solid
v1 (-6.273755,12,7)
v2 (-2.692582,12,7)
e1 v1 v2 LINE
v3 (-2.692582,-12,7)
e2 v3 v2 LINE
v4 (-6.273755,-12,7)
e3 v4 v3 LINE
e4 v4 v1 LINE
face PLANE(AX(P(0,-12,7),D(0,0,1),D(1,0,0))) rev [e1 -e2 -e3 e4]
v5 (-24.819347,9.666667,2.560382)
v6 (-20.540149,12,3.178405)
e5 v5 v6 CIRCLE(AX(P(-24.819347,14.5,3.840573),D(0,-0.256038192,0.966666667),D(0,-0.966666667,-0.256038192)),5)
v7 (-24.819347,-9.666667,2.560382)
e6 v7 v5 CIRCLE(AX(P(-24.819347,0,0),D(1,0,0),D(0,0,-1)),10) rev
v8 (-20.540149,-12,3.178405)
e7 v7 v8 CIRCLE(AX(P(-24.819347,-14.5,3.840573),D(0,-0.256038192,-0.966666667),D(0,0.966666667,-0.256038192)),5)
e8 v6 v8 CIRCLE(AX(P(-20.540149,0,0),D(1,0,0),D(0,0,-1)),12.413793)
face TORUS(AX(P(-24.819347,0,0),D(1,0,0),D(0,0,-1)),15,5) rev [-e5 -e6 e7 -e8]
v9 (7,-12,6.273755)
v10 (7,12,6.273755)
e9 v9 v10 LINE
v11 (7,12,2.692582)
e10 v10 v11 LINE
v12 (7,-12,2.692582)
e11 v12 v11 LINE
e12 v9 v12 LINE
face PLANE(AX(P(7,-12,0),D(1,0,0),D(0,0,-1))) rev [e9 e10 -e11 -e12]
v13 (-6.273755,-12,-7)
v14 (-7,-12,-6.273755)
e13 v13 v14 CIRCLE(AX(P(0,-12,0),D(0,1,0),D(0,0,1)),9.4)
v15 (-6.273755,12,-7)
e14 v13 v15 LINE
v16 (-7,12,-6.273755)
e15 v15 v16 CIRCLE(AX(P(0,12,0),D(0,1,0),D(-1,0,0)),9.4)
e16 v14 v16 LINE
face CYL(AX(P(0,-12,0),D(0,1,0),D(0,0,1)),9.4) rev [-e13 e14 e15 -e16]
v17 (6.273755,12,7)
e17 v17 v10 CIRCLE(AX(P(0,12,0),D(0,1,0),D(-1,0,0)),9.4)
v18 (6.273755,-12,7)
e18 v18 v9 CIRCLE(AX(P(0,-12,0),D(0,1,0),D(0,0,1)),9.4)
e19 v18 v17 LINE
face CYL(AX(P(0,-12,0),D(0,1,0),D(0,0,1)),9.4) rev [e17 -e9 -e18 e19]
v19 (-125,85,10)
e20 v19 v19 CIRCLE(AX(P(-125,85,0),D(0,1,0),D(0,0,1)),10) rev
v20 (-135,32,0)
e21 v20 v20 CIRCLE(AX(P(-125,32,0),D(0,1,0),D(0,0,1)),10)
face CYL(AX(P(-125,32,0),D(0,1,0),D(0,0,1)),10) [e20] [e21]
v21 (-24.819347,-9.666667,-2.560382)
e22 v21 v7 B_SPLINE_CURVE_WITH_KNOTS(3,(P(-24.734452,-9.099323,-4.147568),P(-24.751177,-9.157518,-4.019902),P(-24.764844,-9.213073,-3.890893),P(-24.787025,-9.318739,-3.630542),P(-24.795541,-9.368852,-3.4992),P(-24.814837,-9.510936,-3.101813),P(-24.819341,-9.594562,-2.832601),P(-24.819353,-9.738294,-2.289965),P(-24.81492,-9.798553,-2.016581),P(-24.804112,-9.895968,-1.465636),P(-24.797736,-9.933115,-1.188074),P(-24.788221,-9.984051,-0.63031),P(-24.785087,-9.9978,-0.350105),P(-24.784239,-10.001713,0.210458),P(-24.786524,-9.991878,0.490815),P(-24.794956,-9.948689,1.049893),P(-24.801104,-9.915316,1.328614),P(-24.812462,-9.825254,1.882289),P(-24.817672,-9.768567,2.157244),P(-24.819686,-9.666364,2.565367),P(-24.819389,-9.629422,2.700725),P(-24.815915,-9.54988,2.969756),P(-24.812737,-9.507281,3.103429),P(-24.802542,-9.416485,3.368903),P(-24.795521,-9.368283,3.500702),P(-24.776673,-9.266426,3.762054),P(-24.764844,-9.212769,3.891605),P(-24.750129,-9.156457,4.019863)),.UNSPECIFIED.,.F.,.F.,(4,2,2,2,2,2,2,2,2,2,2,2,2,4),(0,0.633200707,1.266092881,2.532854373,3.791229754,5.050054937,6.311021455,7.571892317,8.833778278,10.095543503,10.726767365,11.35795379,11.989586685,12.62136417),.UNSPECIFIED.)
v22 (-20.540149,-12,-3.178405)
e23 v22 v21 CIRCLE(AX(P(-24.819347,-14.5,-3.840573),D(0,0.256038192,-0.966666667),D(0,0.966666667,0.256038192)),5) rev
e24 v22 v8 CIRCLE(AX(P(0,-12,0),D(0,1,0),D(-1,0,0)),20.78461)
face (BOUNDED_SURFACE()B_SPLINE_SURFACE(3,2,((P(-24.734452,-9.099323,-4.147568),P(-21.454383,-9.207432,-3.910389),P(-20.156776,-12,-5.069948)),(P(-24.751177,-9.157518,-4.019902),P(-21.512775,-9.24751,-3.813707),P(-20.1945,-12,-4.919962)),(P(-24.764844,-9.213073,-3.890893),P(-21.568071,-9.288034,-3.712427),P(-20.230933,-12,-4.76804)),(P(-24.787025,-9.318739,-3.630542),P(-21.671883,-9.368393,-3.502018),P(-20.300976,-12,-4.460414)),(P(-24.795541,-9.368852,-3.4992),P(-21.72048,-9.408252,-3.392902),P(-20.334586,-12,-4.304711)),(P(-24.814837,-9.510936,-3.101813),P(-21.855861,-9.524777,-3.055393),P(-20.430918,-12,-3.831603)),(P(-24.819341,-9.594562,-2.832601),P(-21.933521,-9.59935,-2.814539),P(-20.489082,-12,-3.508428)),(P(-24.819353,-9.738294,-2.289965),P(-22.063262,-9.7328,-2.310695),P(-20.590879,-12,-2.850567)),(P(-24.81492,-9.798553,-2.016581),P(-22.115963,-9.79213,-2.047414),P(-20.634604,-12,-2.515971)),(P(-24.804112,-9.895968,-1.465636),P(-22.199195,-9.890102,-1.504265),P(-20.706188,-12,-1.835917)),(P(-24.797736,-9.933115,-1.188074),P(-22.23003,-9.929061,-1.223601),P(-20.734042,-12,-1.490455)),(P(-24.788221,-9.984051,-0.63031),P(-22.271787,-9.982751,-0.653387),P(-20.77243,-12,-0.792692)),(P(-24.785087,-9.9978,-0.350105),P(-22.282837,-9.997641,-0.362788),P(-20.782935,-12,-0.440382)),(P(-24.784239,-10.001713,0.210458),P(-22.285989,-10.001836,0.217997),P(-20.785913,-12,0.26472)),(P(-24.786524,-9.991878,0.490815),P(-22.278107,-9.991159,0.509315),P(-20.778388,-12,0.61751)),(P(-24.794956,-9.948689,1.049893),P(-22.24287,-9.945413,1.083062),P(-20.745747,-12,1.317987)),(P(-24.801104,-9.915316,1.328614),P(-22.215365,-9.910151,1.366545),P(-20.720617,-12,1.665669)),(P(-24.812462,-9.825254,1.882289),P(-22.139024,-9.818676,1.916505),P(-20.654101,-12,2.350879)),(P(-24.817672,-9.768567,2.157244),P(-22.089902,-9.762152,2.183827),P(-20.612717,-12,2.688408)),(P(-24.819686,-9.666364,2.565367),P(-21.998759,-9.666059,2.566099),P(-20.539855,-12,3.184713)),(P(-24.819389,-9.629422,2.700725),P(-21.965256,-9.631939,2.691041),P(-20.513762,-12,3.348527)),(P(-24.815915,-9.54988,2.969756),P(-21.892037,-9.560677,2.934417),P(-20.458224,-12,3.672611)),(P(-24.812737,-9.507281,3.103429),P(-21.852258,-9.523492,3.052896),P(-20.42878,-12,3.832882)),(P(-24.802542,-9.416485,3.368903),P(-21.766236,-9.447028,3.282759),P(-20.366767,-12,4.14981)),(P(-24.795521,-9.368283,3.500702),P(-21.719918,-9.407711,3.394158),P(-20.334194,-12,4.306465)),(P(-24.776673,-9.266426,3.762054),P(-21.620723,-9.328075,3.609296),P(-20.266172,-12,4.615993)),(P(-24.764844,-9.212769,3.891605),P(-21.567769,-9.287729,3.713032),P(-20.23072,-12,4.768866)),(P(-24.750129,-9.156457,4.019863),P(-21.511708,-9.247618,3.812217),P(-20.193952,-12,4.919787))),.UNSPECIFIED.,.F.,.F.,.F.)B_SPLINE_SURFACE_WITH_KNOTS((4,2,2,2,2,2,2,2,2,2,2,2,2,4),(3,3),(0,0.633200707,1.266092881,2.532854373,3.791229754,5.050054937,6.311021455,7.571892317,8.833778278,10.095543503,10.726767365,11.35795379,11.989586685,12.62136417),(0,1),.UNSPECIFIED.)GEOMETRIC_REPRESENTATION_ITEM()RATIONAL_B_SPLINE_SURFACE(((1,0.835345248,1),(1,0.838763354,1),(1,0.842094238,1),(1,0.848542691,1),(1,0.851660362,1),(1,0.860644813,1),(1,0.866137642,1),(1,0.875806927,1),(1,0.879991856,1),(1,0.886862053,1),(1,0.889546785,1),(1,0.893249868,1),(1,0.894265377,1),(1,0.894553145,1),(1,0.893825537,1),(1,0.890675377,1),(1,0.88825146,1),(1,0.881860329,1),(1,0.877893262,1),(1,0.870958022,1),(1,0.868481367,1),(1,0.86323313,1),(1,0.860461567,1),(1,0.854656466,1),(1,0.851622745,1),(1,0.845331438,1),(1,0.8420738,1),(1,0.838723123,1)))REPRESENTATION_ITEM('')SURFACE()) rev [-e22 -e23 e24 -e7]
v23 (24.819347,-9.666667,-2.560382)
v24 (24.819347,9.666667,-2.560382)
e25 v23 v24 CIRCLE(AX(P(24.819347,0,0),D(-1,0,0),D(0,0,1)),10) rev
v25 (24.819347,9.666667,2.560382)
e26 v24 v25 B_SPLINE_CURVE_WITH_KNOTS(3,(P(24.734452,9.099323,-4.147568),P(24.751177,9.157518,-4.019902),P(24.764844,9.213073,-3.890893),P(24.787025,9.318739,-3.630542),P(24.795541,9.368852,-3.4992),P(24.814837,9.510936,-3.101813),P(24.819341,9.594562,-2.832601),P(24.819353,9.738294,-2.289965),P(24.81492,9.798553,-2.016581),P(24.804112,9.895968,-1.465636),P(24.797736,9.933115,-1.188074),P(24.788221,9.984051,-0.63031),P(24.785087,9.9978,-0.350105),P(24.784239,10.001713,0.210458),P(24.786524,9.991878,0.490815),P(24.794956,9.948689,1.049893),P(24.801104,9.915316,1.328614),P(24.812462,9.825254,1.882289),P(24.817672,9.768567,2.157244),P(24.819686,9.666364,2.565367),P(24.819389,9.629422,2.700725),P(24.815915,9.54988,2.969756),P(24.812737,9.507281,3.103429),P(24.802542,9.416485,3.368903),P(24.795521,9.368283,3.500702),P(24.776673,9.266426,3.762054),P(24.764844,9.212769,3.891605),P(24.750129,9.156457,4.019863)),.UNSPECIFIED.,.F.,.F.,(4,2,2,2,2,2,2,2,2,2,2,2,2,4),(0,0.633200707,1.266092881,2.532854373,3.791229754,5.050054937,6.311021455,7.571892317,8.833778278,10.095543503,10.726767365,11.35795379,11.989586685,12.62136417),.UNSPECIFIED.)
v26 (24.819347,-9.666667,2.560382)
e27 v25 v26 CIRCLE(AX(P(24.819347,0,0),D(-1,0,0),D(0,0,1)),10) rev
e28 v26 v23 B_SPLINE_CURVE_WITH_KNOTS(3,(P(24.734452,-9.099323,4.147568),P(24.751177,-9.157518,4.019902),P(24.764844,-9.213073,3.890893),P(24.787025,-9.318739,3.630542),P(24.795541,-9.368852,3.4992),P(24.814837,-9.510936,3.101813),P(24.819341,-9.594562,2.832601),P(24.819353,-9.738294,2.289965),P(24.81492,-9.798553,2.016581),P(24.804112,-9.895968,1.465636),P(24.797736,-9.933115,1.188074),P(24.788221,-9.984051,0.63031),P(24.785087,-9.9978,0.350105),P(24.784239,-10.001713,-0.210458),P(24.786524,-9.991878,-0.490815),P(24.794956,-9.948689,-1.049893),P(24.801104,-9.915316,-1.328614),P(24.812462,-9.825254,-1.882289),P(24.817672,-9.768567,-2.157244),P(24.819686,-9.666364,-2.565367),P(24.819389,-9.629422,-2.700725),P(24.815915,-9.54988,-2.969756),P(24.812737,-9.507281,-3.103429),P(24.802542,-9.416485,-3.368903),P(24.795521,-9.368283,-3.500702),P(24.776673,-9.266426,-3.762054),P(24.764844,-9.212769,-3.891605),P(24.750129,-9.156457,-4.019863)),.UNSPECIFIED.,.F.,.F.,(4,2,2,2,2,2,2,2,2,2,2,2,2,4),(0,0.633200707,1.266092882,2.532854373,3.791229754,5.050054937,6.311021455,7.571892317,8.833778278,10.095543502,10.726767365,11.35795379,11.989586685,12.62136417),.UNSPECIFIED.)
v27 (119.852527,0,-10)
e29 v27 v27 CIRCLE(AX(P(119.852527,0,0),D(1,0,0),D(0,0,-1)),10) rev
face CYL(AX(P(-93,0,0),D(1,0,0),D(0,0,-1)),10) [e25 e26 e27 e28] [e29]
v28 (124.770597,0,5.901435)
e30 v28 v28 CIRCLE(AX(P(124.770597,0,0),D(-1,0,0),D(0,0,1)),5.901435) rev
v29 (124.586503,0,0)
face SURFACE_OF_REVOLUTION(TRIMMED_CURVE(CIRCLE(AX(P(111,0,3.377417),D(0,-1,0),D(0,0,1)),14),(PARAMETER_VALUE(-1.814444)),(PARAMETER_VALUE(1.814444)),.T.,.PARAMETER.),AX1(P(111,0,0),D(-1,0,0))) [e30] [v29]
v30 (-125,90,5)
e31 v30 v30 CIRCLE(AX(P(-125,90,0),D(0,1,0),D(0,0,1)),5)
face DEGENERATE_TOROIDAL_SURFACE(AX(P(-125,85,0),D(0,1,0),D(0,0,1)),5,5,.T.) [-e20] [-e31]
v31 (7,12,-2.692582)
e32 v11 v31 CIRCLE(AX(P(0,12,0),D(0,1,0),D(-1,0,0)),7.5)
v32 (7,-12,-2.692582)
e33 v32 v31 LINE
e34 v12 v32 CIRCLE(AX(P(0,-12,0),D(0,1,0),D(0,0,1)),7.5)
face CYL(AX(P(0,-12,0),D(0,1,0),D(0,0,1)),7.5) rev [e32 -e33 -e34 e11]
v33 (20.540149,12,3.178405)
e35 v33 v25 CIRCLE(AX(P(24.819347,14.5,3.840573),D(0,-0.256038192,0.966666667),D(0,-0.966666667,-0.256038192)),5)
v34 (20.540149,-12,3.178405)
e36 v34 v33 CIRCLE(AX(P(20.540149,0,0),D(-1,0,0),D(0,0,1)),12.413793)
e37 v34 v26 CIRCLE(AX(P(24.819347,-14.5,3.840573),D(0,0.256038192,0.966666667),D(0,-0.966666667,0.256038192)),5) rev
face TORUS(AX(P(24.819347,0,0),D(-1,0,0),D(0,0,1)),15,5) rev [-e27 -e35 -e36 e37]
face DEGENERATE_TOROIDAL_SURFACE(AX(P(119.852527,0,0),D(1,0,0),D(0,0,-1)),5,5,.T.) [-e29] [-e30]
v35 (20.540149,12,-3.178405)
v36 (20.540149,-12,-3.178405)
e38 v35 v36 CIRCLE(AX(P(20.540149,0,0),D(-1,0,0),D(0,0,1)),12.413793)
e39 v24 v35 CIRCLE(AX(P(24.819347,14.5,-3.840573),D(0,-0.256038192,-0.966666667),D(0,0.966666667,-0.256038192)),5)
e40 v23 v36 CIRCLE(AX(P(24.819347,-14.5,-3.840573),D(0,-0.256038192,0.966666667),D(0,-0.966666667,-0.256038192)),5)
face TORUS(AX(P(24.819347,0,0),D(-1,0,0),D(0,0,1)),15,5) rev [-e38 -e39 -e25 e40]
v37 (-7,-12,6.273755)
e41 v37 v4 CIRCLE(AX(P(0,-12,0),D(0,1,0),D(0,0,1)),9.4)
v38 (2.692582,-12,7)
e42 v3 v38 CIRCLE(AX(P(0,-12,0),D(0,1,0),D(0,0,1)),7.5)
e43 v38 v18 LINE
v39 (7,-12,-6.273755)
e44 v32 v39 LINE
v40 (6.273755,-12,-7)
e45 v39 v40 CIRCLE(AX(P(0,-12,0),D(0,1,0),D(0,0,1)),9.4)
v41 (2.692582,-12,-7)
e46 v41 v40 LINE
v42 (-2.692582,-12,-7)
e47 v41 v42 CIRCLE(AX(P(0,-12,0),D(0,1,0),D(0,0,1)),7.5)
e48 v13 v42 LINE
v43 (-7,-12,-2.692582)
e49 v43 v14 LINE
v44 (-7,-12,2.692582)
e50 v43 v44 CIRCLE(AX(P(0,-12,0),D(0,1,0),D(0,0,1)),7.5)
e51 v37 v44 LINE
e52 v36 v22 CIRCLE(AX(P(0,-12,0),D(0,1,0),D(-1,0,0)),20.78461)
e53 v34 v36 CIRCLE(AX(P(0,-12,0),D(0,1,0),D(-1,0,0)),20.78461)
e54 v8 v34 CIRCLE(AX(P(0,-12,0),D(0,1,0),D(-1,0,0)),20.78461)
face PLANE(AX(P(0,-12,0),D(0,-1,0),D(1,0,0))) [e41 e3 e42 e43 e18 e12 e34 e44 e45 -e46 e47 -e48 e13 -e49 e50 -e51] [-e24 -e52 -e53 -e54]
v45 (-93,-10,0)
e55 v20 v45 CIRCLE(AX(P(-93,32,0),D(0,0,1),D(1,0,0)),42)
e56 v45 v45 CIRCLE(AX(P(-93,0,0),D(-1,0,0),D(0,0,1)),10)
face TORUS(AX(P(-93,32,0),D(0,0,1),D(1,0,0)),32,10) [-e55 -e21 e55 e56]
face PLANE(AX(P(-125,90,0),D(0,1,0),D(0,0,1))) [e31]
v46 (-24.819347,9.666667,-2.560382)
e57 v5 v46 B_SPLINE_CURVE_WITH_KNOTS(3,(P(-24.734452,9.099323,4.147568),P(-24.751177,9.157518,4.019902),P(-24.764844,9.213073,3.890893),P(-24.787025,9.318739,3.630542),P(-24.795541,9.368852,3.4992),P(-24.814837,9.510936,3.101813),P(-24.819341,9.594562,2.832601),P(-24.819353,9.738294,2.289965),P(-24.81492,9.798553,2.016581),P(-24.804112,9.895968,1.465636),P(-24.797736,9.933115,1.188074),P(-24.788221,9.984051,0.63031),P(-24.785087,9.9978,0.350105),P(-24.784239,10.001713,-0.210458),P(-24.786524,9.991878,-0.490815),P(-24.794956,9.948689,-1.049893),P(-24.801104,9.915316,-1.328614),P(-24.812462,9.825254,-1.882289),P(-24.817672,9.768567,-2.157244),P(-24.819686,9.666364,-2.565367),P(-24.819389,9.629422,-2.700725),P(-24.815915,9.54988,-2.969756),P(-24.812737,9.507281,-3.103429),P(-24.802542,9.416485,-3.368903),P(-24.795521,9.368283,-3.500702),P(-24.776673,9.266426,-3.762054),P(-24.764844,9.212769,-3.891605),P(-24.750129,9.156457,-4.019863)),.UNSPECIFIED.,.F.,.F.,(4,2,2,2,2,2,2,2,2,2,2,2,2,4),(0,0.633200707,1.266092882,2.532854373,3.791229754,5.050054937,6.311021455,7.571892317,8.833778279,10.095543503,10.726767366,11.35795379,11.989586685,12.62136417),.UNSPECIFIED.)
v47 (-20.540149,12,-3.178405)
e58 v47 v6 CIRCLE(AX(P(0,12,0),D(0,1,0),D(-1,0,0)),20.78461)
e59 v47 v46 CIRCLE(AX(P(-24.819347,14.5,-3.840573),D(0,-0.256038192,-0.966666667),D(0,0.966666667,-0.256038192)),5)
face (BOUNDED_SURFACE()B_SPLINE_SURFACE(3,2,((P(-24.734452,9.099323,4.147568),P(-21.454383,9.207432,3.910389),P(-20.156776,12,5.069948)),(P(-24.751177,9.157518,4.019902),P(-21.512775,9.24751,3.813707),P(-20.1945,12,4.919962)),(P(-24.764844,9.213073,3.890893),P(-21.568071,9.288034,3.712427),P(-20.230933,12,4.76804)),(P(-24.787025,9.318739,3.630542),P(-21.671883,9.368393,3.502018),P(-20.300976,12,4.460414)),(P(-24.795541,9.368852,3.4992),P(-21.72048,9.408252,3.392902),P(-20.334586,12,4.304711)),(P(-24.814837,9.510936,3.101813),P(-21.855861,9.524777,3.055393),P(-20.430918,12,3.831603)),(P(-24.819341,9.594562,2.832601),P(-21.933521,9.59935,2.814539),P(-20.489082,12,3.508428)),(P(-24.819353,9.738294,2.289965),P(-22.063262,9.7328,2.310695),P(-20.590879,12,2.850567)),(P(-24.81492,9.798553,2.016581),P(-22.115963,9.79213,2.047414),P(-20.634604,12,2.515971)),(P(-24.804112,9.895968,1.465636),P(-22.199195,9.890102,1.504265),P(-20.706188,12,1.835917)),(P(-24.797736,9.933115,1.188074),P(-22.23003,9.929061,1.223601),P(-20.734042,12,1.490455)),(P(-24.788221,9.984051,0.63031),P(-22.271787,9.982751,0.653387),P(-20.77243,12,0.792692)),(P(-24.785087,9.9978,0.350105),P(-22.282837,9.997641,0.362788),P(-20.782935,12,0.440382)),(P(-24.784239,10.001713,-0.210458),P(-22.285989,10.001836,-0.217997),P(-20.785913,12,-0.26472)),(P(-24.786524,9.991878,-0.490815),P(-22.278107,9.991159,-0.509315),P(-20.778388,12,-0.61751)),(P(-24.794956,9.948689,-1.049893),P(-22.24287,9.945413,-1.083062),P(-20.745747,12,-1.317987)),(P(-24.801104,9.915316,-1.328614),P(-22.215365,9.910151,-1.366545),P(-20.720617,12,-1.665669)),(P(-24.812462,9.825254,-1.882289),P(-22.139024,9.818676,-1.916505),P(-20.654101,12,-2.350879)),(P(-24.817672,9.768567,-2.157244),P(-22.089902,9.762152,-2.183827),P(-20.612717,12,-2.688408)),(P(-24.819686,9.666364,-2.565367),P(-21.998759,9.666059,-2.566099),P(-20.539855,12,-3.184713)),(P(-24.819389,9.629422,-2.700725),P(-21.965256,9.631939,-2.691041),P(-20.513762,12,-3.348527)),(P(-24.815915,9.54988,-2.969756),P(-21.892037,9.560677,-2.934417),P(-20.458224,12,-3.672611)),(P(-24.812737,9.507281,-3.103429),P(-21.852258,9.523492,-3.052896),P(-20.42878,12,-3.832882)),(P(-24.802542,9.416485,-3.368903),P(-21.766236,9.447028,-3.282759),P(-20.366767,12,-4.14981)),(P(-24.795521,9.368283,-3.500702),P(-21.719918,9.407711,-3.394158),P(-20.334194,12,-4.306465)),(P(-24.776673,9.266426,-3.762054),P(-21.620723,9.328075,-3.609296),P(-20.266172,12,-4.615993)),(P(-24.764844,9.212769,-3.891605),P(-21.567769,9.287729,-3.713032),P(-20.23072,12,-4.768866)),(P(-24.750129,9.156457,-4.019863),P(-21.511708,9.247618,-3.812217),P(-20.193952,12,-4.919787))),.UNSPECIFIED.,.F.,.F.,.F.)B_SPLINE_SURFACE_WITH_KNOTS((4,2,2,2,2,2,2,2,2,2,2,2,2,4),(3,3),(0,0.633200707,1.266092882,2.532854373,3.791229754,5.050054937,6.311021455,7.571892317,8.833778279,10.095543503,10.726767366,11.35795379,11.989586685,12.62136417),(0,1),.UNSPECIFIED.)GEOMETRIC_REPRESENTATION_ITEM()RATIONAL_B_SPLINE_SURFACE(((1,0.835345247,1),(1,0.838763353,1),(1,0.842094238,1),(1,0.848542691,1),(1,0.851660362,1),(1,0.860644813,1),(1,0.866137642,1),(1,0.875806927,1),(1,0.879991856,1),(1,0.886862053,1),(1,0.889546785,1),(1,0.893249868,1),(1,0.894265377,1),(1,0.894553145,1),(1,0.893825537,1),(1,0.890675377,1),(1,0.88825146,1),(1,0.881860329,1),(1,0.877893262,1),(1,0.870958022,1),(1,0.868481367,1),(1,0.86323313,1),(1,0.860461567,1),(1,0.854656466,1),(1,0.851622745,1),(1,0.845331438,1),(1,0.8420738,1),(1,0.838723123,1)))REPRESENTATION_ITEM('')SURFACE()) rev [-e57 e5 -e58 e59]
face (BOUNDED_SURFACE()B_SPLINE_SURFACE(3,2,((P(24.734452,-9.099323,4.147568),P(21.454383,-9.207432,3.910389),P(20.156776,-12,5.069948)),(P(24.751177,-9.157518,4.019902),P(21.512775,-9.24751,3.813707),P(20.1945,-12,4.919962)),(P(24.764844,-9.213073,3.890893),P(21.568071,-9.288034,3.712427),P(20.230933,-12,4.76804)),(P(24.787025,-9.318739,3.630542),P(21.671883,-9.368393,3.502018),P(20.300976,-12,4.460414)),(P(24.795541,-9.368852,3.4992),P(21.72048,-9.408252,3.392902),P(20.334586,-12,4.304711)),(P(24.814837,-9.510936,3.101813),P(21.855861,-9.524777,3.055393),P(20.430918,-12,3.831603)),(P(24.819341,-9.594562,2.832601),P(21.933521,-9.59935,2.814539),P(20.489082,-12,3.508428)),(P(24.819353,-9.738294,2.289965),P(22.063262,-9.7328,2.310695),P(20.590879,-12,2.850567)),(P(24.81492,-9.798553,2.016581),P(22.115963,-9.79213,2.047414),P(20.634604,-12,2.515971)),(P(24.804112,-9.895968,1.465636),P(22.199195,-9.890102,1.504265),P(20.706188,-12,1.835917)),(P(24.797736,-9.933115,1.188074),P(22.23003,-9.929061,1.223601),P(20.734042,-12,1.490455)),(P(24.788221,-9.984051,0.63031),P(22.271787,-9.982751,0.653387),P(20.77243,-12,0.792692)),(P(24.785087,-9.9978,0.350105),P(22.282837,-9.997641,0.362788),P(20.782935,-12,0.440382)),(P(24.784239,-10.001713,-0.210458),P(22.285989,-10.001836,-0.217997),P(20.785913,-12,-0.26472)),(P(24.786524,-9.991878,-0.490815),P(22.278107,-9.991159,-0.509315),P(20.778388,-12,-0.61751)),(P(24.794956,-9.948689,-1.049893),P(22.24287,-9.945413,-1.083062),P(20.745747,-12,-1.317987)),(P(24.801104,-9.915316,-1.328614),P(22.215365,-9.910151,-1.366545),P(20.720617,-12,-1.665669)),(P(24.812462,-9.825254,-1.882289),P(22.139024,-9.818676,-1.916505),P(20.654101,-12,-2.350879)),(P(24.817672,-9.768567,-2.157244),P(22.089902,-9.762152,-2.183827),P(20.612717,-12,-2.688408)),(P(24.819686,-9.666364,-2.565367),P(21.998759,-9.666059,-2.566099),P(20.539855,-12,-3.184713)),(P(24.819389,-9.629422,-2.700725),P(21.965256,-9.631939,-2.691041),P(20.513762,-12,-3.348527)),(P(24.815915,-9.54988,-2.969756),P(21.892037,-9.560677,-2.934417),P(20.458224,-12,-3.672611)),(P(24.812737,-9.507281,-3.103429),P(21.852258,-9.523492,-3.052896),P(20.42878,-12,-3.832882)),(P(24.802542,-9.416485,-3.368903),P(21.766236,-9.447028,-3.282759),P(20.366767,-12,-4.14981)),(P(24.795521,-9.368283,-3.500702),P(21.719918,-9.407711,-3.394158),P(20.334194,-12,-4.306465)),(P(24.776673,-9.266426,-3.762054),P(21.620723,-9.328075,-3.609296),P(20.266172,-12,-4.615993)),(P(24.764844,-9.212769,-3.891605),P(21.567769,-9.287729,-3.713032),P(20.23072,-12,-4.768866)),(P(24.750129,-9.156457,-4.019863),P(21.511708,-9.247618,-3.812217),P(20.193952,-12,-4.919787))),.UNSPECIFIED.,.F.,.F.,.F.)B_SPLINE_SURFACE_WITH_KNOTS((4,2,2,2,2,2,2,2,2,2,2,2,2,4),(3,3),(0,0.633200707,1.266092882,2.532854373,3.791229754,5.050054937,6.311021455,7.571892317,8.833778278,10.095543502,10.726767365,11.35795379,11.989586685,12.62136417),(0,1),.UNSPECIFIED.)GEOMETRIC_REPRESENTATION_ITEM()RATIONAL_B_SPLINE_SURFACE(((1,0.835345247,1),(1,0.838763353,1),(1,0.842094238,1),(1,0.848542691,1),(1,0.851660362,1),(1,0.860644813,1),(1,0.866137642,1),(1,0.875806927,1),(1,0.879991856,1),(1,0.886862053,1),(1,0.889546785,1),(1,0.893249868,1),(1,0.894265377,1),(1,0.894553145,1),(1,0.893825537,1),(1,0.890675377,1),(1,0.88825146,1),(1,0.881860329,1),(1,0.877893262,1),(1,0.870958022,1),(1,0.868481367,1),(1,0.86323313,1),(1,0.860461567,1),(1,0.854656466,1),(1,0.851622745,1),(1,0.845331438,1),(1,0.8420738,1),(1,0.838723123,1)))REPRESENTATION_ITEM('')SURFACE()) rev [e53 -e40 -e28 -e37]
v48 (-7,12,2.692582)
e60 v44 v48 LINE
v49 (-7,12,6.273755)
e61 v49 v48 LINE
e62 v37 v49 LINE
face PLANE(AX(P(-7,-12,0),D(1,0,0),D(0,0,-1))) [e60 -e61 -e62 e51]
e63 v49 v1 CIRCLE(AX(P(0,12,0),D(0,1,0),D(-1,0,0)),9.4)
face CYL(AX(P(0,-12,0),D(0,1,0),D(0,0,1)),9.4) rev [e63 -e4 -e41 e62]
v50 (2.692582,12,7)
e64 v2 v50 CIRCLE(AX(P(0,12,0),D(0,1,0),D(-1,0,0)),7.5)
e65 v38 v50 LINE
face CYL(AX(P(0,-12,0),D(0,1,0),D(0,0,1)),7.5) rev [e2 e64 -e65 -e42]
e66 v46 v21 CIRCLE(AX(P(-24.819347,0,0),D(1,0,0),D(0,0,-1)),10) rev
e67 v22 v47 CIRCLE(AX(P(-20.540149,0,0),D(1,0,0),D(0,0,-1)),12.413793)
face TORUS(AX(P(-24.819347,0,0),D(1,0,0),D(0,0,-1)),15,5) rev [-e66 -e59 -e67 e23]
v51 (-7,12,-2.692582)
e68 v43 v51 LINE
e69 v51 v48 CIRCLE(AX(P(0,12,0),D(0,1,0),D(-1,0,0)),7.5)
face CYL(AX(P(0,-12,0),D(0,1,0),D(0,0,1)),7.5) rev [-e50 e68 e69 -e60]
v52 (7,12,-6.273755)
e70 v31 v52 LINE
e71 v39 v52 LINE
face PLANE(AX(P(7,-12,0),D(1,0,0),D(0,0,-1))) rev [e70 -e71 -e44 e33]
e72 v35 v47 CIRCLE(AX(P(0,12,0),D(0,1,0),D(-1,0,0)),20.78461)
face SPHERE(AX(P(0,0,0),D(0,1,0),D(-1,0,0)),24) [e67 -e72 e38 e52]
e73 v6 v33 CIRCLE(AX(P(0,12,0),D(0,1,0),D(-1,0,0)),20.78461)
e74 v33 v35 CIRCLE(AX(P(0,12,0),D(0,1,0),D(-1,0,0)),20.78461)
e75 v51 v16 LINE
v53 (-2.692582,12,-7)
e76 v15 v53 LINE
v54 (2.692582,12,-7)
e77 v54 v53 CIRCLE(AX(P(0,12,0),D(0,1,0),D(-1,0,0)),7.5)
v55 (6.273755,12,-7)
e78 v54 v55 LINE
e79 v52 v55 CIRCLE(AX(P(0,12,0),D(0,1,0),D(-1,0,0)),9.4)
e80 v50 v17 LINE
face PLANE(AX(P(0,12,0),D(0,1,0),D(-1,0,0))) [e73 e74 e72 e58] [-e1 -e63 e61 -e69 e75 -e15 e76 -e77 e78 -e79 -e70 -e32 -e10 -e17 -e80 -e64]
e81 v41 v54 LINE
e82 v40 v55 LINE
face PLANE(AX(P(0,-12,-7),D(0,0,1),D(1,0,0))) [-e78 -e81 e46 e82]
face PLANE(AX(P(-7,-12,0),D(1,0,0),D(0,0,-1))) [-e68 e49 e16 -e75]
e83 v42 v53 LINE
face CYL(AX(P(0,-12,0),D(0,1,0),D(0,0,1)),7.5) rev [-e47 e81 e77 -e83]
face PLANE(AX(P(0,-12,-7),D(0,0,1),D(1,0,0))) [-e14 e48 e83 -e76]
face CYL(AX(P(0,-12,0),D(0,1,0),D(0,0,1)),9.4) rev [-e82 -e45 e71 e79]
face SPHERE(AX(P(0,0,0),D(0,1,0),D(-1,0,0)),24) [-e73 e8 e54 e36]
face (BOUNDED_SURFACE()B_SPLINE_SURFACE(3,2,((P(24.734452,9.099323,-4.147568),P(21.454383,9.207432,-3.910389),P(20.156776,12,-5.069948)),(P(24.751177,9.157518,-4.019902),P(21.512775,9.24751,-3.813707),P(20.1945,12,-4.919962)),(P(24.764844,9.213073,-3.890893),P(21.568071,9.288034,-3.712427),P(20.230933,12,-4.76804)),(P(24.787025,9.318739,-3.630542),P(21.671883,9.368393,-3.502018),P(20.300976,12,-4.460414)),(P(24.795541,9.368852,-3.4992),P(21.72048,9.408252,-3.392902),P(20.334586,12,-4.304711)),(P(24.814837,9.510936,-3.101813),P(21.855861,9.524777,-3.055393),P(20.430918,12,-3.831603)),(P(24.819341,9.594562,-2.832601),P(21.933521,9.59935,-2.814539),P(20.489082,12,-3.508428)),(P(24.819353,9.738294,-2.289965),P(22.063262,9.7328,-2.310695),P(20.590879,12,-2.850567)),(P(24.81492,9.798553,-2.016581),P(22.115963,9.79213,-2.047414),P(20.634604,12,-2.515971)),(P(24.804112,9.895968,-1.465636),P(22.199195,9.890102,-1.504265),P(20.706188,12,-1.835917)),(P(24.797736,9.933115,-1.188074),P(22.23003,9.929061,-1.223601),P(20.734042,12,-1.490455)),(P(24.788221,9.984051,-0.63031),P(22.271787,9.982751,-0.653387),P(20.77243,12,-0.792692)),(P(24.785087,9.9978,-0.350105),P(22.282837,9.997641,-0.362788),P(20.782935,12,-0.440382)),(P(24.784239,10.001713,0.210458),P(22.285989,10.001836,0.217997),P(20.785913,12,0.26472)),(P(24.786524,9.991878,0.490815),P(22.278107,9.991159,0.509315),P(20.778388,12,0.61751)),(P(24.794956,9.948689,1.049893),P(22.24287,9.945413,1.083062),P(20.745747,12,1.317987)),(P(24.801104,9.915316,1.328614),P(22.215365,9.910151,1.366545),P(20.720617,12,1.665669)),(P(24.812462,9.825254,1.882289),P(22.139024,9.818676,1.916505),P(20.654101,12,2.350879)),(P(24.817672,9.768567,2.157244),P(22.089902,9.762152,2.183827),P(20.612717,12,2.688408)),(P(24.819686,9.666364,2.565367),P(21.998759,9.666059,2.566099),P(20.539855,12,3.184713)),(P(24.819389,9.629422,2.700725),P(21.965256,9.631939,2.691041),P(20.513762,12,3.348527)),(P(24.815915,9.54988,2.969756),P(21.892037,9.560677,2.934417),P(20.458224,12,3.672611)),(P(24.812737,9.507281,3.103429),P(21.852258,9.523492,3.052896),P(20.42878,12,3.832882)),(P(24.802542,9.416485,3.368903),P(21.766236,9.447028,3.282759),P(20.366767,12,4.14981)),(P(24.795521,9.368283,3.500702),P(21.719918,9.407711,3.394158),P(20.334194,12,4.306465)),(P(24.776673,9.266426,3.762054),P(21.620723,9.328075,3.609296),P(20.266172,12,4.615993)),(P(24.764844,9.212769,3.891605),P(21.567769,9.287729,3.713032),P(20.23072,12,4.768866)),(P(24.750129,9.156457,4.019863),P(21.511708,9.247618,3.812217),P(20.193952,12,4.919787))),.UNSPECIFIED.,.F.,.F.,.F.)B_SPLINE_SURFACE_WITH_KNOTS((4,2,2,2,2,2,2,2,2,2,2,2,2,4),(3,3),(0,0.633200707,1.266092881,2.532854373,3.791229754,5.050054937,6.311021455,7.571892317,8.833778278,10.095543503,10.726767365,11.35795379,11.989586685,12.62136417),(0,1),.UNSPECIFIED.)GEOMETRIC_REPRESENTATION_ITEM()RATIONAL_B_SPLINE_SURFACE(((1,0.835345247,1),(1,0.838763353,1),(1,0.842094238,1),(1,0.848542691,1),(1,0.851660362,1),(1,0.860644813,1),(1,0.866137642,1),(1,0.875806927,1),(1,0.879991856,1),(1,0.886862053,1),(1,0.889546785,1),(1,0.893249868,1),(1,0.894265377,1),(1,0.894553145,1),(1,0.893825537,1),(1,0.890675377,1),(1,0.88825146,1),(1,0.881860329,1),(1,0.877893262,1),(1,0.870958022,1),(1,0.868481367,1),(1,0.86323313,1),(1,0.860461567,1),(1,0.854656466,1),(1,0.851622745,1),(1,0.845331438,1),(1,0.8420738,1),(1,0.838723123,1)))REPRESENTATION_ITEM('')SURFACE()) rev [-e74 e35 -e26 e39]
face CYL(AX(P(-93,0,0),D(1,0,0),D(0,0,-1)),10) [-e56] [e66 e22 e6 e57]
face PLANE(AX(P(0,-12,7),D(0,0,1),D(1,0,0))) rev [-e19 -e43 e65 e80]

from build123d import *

# Parameters (mm, degrees)
SKETCH_2_R               = 9.999999999999993
FILLET_1_R               = 5
CUT_EXTRUDE_1_DEPTH      = 165.01524327634917
CUT_EXTRUDE_1_DEPTH_BACK = 165.01524327634917


with BuildPart() as part:
    # По траектории1: sweep along a path in Эскиз1
    with BuildLine(Plane.XY) as sweep_1_path:
        Line((-125, 90), (-125, 31.999999999999993))
        ThreePointArc((-125, 31.999999999999993), (-115.62741699796952, 9.372583002030478), (-93, 0))
        Line((-93, 0), (124.99999999999999, 0))
    # Эскиз2 → По траектории1 (sweep)
    with BuildSketch(Plane(origin=(0, 90, 0), x_dir=(1, 0, 0), z_dir=(0, 1, 0))):
        with Locations((-125, 0)):
            Circle(SKETCH_2_R)
    sweep(path=sweep_1_path.line)

    # Эскиз3 → Повернуть1 (revolve)
    with BuildSketch(Plane.XY):
        with BuildLine():
            Line((4.49e-15, 12), (4.49e-15, -12))
            Line((4.49e-15, -12), (-20.784609690826528, -12))
            ThreePointArc((-20.784609690826528, -12), (-24, 2.94e-15), (-20.784609690826528, 12))
            Line((-20.784609690826528, 12), (4.49e-15, 12))
        make_face()
    revolve(axis=Axis((4.49e-15, 20.353481922740002, 0), (-1.1e-16, -1, 0)))

    # Эскиз6 → Вырез-Повернуть1 (revolve, cut)
    with BuildSketch(Plane.XY, mode=Mode.PRIVATE) as cut_revolve_1_sk:
        with BuildLine():
            Line((123.3345611656252, 10.000000000000009), (253.93494063523158, 10.000000000000009))
            Line((253.93494063523158, 10.000000000000009), (253.93494063523158, 0))
            Line((253.93494063523158, 0), (124.58650256653851, 0))
            ThreePointArc((124.58650256653851, 0), (124.89155809301906, 5.116559027883884), (123.3345611656252, 10.000000000000009))
        make_face()
    revolve(cut_revolve_1_sk.sketch.rotate(Axis((-23.23871769146635, 0, 0), (1, 0, 0)), 90), axis=Axis((-23.23871769146635, 0, 0), (1, 0, 0)), mode=Mode.SUBTRACT)

    # Скругление1
    fillet_1_edges = [part.edges().sort_by_distance(p)[0] for p in [
        (-135, 90, 1.22e-15),
    ]]
    fillet(fillet_1_edges, radius=FILLET_1_R)
    fillet_1_2_edges = [part.edges().sort_by_distance(p)[0] for p in [
        (-21.81742422927143, 2.45e-15, 9.999999999999993),
        (-21.81742422927143, -1.22e-15, -9.999999999999993),
    ]]
    fillet(fillet_1_2_edges, radius=FILLET_1_R - 0.0001)  # a hair under: the kernel refuses the full size
    fillet_1_3_edges = [part.edges().sort_by_distance(p)[0] for p in [
        (21.817424229271403, -9.999999999999993, 3.06e-15),
    ]]
    fillet(fillet_1_3_edges, radius=FILLET_1_R)
    fillet_1_4_edges = [part.edges().sort_by_distance(p)[0] for p in [
        (123.33456116562522, 7.071067811865514, 7.071067811865446),
        (123.33456116562522, -7.07106781186551, -7.071067811865451),
    ]]
    fillet(fillet_1_4_edges, radius=FILLET_1_R)

    # Эскиз7 → Вырез-Вытянуть1 (cut, two sides: drawn at the far end of the back side and taken through both)
    with BuildSketch(Plane(origin=(0, 0, 0), x_dir=(1, 0, 0), z_dir=(0, 1, 0)).offset(-CUT_EXTRUDE_1_DEPTH_BACK)):
        with BuildLine():
            ThreePointArc((-6.999999999999877, -6.273754856543386), (-6.646803743153483, -6.646803743153611), (-6.273754856543252, -6.999999999999998))
            Line((-6.273754856543248, -7.000000000000002), (-2.6925824035672585, -7.000000000000006))
            ThreePointArc((-2.692582403567258, -6.999999999999998), (-3.242e-14, -7.5), (2.6925824035671977, -7.000000000000021))
            Line((2.692582403567193, -7.000000000000002), (6.2737548565430865, -7.000000000000002))
            ThreePointArc((6.273754856543118, -7.000000000000118), (6.646803743153469, -6.646803743153625), (6.999999999999976, -6.273754856543277))
            Line((6.999999999999987, -6.273754856543277), (6.999999999999956, -2.6925824035677124))
            ThreePointArc((6.999999999999835, -2.692582403567684), (7.500000000000001, 1.33e-15), (6.999999999999835, 2.6925824035676857))
            Line((6.999999999999997, 2.692582403567716), (6.999999999999997, 6.27375485654329))
            ThreePointArc((6.999999999999971, 6.273754856543282), (6.646803743153472, 6.6468037431536215), (6.273754856543124, 7.000000000000112))
            Line((6.2737548565430865, 6.999999999999998), (2.6925824035671964, 6.999999999999998))
            ThreePointArc((2.6925824035671995, 7.000000000000021), (-3.331e-14, 7.500000000000001), (-2.692582403567263, 6.9999999999999964))
            Line((-2.692582403567263, 7.0000000000000036), (-6.27375485654325, 6.999999999999999))
            ThreePointArc((-6.273754856543249, 7), (-6.646803743153482, 6.646803743153612), (-6.999999999999876, 6.273754856543388))
            Line((-7.000000000000003, 6.273754856543425), (-7.000000000000003, 2.692582403567693))
            ThreePointArc((-6.999999999999842, 2.692582403567664), (-7.5, -2.22e-15), (-6.99999999999984, -2.692582403567666))
            Line((-6.99999999999992, -2.6925824035676946), (-6.999999999999922, -6.273754856543425))
        make_face()
    extrude(amount=CUT_EXTRUDE_1_DEPTH + CUT_EXTRUDE_1_DEPTH_BACK, mode=Mode.SUBTRACT)


solid = part.part
